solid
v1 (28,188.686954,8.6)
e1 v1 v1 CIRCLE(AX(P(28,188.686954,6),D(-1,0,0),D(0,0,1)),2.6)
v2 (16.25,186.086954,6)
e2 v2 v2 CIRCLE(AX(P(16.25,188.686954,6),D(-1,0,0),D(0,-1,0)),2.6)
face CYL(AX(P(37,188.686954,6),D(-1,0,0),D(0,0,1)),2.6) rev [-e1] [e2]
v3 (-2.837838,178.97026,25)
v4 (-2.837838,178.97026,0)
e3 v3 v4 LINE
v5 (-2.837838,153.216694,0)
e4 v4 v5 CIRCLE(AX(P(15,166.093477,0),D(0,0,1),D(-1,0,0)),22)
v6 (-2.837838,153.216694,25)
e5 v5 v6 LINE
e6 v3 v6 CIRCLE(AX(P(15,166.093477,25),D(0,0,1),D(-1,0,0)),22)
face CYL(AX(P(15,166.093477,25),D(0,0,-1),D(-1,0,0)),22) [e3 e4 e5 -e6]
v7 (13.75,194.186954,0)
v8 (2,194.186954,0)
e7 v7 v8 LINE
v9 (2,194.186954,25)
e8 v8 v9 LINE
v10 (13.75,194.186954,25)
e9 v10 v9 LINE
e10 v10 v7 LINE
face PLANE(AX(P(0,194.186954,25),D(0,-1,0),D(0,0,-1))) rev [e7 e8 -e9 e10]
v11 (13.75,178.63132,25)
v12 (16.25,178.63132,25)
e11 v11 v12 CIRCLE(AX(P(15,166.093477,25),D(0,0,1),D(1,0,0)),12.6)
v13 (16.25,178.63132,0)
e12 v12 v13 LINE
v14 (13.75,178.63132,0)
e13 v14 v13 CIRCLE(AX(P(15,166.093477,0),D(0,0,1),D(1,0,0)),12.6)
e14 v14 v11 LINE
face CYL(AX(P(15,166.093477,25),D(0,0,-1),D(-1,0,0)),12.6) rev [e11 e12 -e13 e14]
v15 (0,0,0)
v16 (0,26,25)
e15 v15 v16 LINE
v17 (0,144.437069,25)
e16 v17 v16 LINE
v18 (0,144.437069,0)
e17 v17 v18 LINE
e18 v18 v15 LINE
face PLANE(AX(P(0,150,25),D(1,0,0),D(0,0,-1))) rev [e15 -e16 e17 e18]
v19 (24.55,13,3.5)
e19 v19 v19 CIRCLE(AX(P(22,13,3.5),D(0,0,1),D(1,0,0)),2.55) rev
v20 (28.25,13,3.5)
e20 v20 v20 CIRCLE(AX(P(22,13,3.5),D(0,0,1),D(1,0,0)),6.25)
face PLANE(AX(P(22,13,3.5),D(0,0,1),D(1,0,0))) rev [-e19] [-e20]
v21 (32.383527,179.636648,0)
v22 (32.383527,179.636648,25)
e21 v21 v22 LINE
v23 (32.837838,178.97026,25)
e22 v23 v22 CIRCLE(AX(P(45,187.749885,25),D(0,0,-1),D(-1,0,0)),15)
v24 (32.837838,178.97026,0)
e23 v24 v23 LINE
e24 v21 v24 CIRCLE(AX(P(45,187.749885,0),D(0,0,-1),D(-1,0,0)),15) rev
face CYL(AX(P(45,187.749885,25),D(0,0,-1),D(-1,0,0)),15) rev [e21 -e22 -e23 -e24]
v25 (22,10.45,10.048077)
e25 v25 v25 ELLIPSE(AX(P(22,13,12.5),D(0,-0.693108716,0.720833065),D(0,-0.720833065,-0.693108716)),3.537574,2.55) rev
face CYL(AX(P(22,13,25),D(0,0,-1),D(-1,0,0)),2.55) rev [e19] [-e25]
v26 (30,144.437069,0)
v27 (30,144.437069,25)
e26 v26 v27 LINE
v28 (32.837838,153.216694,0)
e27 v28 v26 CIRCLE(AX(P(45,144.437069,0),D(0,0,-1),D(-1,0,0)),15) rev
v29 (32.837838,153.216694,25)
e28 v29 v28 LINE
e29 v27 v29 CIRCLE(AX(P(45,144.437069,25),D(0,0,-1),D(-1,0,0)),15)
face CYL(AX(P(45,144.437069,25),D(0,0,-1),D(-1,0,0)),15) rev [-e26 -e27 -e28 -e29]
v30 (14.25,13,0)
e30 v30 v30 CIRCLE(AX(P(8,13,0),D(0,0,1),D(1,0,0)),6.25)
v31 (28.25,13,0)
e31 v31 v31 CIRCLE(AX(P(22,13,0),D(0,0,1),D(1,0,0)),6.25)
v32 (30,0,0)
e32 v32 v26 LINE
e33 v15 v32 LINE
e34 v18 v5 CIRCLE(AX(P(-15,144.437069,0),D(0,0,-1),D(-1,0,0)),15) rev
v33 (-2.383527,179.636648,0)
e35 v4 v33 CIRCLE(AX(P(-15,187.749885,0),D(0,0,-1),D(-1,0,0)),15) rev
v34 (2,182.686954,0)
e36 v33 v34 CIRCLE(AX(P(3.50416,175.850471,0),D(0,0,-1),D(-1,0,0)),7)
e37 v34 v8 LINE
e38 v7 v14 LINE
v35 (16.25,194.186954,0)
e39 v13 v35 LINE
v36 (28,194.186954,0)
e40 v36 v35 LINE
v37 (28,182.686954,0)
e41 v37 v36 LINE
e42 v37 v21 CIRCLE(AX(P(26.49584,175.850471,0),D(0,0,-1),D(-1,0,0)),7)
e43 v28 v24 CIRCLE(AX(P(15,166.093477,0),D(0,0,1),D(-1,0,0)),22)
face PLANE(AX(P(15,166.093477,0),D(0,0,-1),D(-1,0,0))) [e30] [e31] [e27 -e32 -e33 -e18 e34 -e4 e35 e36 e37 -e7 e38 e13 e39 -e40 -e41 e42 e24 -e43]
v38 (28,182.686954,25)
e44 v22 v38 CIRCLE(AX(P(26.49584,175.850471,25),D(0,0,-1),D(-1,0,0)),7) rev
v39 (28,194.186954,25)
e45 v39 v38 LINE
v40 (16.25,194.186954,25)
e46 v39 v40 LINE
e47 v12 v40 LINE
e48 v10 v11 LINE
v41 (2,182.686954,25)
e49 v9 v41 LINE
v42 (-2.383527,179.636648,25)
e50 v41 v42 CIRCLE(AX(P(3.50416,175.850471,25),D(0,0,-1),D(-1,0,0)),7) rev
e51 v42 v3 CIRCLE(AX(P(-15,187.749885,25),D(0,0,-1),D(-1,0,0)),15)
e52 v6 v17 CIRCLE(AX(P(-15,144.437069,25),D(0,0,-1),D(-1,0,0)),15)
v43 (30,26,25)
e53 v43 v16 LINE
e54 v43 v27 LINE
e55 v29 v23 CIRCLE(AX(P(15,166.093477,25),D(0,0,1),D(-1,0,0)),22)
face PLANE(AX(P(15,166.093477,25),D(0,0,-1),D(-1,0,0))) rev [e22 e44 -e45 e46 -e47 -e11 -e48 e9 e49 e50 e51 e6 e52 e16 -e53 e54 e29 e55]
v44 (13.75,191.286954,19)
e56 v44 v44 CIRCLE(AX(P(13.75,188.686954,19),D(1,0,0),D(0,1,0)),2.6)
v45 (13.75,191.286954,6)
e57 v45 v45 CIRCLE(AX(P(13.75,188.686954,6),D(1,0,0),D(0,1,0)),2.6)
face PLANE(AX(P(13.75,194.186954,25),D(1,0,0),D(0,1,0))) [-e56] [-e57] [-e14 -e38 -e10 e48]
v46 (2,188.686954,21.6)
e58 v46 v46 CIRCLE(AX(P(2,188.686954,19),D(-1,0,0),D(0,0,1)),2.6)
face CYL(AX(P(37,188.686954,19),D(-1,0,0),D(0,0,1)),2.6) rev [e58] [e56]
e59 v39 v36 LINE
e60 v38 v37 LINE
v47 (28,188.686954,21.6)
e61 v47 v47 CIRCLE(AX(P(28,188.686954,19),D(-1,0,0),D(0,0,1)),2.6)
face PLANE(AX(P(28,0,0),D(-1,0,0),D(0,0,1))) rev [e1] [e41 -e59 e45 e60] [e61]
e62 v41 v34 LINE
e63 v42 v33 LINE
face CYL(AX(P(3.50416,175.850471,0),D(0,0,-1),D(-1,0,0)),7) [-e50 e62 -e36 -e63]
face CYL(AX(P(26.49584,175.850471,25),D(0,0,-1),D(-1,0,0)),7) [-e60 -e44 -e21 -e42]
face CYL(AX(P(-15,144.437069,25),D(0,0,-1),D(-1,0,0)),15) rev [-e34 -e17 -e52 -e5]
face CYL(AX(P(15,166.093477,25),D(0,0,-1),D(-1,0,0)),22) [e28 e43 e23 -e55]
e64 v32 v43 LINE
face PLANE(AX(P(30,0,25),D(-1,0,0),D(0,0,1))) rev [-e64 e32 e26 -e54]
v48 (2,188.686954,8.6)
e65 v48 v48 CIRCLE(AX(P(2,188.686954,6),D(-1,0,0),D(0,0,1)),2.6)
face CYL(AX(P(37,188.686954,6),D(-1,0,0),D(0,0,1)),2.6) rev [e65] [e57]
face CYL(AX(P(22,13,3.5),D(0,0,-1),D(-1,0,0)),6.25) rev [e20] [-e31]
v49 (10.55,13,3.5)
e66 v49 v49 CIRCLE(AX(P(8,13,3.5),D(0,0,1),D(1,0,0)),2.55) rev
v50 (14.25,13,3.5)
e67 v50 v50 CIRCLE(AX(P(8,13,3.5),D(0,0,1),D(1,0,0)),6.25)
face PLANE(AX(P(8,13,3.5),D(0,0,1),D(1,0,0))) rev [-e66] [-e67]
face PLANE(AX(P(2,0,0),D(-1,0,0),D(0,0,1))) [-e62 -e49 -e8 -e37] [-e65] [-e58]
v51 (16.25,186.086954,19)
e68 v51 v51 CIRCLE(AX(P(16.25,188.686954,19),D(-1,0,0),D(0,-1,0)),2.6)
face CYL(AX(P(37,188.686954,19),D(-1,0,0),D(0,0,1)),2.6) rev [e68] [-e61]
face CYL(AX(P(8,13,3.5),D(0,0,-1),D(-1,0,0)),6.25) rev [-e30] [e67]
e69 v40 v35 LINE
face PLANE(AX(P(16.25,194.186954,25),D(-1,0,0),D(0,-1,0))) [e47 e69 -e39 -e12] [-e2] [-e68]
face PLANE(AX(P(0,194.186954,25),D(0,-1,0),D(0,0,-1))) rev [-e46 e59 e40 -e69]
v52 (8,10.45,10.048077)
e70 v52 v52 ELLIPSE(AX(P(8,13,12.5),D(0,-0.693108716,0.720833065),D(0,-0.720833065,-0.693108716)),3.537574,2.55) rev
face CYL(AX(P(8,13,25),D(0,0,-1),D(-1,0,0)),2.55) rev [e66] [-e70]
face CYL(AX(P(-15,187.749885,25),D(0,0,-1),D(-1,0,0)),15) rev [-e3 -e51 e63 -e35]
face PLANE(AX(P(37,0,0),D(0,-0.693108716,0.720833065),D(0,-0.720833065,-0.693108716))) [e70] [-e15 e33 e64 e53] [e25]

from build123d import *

# Parameters (mm, degrees)
BOSS_EXTRUDE1_DEPTH      = 25
CUT_EXTRUDE2_DEPTH       = 194.321380264
SKETCH4_R                = 6.25
CUT_EXTRUDE5_DEPTH       = 3.5
SKETCH5_R                = 2.55
CUT_EXTRUDE6_DEPTH       = 194.321380264
SKETCH6_R                = 12.6
CUT_EXTRUDE7_DEPTH       = 194.321380264
SKETCH8_W                = 30
SKETCH8_H                = 12
BOSS_EXTRUDE2_DEPTH      = 25
FILLET1_R                = 15
FILLET2_R                = 2
CUT_EXTRUDE8_DEPTH       = 200.255045248
CUT_EXTRUDE8_DEPTH_BACK  = 200.255045248
SKETCH9_R                = 2.6
CUT_EXTRUDE9_START       = 2
SKETCH10_W               = 25
SKETCH10_H               = 16.5
CUT_EXTRUDE9_DEPTH       = 25
CUT_EXTRUDE10_START      = 28
SKETCH11_W               = 25
SKETCH11_H               = 16.5
CUT_EXTRUDE10_DEPTH      = 25
CUT_EXTRUDE11_DEPTH      = 200.255045248
CUT_EXTRUDE11_DEPTH_BACK = 200.255045248
SKETCH13_W               = 2.5
SKETCH13_H               = 16
FILLET6_R                = 7


with BuildPart() as part:
    # Sketch1 → Boss-Extrude1 (new body)
    with BuildSketch(Plane.XY):
        with BuildLine():
            Line((0, 0), (30, 0))
            Line((30, 0), (30, 150))
            ThreePointArc((30, 150), (15, 188.093476939), (0, 150))
            Line((0, 150), (0, 0))
        make_face()
    extrude(amount=BOSS_EXTRUDE1_DEPTH)

    # Sketch2 → Cut-Extrude2 (cut, through all)
    with BuildSketch(Plane(origin=(0, 0, 0), x_dir=(0, 0, -1), z_dir=(1, 0, 0))):
        Polygon((0, 0), (-25, 26), (-25, 0), align=None)
    extrude(amount=CUT_EXTRUDE2_DEPTH, mode=Mode.SUBTRACT)

    # Sketch4 → Cut-Extrude5 (cut)
    with BuildSketch(Plane.XY):
        with Locations((8, 13)):
            Circle(SKETCH4_R)
        with Locations((22, 13)):
            Circle(SKETCH4_R)
    extrude(amount=CUT_EXTRUDE5_DEPTH, mode=Mode.SUBTRACT)

    # Sketch5 → Cut-Extrude6 (cut, through all)
    with BuildSketch(Plane.XY):
        with Locations(Location((8, 13, 0), (0, 0, 270))):
            Circle(SKETCH5_R)
        with Locations(Location((22, 13, 0), (0, 0, 270))):
            Circle(SKETCH5_R)
    extrude(amount=CUT_EXTRUDE6_DEPTH, mode=Mode.SUBTRACT)

    # Sketch6 → Cut-Extrude7 (cut, through all)
    with BuildSketch(Plane.XY):
        with Locations((15, 166.093476939)):
            Circle(SKETCH6_R)
    extrude(amount=CUT_EXTRUDE7_DEPTH, mode=Mode.SUBTRACT)

    # Sketch8 → Boss-Extrude2 (add)
    with BuildSketch(Plane.XY):
        with Locations((15, 188.186953879)):
            Rectangle(SKETCH8_W, SKETCH8_H)
    extrude(amount=BOSS_EXTRUDE2_DEPTH)

    # Fillet1
    fillet1_edges = [part.edges().sort_by_distance(p)[0] for p in [
        (0, 182.186953879, 12.5),
        (30, 182.186953879, 12.5),
        (0, 150, 12.5),
        (30, 150, 12.5),
    ]]
    fillet(fillet1_edges, radius=FILLET1_R)

    # Fillet2
    fillet2_edges = [part.edges().sort_by_distance(p)[0] for p in [
        (0, 194.186953879, 12.5),
        (30, 194.186953879, 12.5),
    ]]
    fillet(fillet2_edges, radius=FILLET2_R)

    # Sketch9 → Cut-Extrude8 (cut, two sides: drawn at the far end of the back side and taken through both)
    with BuildSketch(Plane(origin=(0, 0, 0), x_dir=(0, 0, -1), z_dir=(1, 0, 0)).offset(-CUT_EXTRUDE8_DEPTH_BACK)):
        with Locations(Location((-6, 188.686953879, 0), (0, 0, 201.12545117))):
            Circle(SKETCH9_R)
        with Locations(Location((-19, 188.686953879, 0), (0, 0, 201.12545117))):
            Circle(SKETCH9_R)
    extrude(amount=CUT_EXTRUDE8_DEPTH + CUT_EXTRUDE8_DEPTH_BACK, mode=Mode.SUBTRACT)

    # Sketch10 → Cut-Extrude9 (cut)
    with BuildSketch(Plane(origin=(0, 0, 0), x_dir=(0, 0, -1), z_dir=(1, 0, 0)).offset(CUT_EXTRUDE9_START)):
        with Locations((-12.5, 190.936953879)):
            Rectangle(SKETCH10_W, SKETCH10_H)
    extrude(amount=-CUT_EXTRUDE9_DEPTH, mode=Mode.SUBTRACT)

    # Sketch11 → Cut-Extrude10 (cut)
    with BuildSketch(Plane(origin=(0, 0, 0), x_dir=(0, 0, -1), z_dir=(1, 0, 0)).offset(CUT_EXTRUDE10_START)):
        with Locations((-12.5, 190.936953879)):
            Rectangle(SKETCH11_W, SKETCH11_H)
    extrude(amount=CUT_EXTRUDE10_DEPTH, mode=Mode.SUBTRACT)

    # Sketch13 → Cut-Extrude11 (cut, two sides: drawn at the far end of the back side and taken through both)
    with BuildSketch(Plane.XY.offset(-CUT_EXTRUDE11_DEPTH_BACK)):
        with Locations((15, 186.186953879)):
            Rectangle(SKETCH13_W, SKETCH13_H)
    extrude(amount=CUT_EXTRUDE11_DEPTH + CUT_EXTRUDE11_DEPTH_BACK, mode=Mode.SUBTRACT)

    # Fillet6
    # the kernel refuses this fillet: 7 mm, written as the material it takes off along each edge
    with BuildSketch(Plane(origin=(30.880271574, 182.686953879, -8.501523298), x_dir=(-1, 0, 0), z_dir=(0, 0, 1))) as fillet6_piece_1:
        with BuildLine():
            CenterArc((4.384431788, 6.836483164), FILLET6_R, 212.743731737, 44.847779206)
            Line((-1.503255553, 3.050305966), (-1.6210093, 2.974582422))
            ThreePointArc((-1.6210093, 2.974582422), (-0.790485812, 1.506002918), (-0.131784132, -0.047254022))
            Line((-0.131784132, -0.047254022), (0, -0.14))
            ThreePointArc((0, -0.14), (1.440135787, -0.14), (2.85018837, -0.136729663))
            Line((2.85018837, -0.136729663), (2.880271574, 0))
        make_face()
    extrude(amount=42.003046595, mode=Mode.SUBTRACT)
    with BuildSketch(Plane(origin=(-0.880271574, 182.686953879, -8.501523298), x_dir=(-0.44205476486446993, -0.8969880628306143, 0), z_dir=(0, 0, 1))) as fillet6_piece_2:
        with BuildLine():
            CenterArc((4.194084827, 6.954882933), FILLET6_R, 218.64354594, 44.847779206)
            Line((-1.273237773, 2.58356922), (-1.382584225, 2.496142945))
            ThreePointArc((-1.382584225, 2.496142945), (-0.762197216, 1.229896943), (-0.125578329, -0.061887667))
            Line((-0.125578329, -0.061887667), (0.01586951, -0.139097659))
            ThreePointArc((0.01586951, -0.139097659), (1.70030466, -0.043320572), (3.384739809, -0.139097659))
            Line((3.384739809, -0.139097659), (3.400609319, 0))
        make_face()
    extrude(amount=42.003046595, mode=Mode.SUBTRACT)


solid = part.part
